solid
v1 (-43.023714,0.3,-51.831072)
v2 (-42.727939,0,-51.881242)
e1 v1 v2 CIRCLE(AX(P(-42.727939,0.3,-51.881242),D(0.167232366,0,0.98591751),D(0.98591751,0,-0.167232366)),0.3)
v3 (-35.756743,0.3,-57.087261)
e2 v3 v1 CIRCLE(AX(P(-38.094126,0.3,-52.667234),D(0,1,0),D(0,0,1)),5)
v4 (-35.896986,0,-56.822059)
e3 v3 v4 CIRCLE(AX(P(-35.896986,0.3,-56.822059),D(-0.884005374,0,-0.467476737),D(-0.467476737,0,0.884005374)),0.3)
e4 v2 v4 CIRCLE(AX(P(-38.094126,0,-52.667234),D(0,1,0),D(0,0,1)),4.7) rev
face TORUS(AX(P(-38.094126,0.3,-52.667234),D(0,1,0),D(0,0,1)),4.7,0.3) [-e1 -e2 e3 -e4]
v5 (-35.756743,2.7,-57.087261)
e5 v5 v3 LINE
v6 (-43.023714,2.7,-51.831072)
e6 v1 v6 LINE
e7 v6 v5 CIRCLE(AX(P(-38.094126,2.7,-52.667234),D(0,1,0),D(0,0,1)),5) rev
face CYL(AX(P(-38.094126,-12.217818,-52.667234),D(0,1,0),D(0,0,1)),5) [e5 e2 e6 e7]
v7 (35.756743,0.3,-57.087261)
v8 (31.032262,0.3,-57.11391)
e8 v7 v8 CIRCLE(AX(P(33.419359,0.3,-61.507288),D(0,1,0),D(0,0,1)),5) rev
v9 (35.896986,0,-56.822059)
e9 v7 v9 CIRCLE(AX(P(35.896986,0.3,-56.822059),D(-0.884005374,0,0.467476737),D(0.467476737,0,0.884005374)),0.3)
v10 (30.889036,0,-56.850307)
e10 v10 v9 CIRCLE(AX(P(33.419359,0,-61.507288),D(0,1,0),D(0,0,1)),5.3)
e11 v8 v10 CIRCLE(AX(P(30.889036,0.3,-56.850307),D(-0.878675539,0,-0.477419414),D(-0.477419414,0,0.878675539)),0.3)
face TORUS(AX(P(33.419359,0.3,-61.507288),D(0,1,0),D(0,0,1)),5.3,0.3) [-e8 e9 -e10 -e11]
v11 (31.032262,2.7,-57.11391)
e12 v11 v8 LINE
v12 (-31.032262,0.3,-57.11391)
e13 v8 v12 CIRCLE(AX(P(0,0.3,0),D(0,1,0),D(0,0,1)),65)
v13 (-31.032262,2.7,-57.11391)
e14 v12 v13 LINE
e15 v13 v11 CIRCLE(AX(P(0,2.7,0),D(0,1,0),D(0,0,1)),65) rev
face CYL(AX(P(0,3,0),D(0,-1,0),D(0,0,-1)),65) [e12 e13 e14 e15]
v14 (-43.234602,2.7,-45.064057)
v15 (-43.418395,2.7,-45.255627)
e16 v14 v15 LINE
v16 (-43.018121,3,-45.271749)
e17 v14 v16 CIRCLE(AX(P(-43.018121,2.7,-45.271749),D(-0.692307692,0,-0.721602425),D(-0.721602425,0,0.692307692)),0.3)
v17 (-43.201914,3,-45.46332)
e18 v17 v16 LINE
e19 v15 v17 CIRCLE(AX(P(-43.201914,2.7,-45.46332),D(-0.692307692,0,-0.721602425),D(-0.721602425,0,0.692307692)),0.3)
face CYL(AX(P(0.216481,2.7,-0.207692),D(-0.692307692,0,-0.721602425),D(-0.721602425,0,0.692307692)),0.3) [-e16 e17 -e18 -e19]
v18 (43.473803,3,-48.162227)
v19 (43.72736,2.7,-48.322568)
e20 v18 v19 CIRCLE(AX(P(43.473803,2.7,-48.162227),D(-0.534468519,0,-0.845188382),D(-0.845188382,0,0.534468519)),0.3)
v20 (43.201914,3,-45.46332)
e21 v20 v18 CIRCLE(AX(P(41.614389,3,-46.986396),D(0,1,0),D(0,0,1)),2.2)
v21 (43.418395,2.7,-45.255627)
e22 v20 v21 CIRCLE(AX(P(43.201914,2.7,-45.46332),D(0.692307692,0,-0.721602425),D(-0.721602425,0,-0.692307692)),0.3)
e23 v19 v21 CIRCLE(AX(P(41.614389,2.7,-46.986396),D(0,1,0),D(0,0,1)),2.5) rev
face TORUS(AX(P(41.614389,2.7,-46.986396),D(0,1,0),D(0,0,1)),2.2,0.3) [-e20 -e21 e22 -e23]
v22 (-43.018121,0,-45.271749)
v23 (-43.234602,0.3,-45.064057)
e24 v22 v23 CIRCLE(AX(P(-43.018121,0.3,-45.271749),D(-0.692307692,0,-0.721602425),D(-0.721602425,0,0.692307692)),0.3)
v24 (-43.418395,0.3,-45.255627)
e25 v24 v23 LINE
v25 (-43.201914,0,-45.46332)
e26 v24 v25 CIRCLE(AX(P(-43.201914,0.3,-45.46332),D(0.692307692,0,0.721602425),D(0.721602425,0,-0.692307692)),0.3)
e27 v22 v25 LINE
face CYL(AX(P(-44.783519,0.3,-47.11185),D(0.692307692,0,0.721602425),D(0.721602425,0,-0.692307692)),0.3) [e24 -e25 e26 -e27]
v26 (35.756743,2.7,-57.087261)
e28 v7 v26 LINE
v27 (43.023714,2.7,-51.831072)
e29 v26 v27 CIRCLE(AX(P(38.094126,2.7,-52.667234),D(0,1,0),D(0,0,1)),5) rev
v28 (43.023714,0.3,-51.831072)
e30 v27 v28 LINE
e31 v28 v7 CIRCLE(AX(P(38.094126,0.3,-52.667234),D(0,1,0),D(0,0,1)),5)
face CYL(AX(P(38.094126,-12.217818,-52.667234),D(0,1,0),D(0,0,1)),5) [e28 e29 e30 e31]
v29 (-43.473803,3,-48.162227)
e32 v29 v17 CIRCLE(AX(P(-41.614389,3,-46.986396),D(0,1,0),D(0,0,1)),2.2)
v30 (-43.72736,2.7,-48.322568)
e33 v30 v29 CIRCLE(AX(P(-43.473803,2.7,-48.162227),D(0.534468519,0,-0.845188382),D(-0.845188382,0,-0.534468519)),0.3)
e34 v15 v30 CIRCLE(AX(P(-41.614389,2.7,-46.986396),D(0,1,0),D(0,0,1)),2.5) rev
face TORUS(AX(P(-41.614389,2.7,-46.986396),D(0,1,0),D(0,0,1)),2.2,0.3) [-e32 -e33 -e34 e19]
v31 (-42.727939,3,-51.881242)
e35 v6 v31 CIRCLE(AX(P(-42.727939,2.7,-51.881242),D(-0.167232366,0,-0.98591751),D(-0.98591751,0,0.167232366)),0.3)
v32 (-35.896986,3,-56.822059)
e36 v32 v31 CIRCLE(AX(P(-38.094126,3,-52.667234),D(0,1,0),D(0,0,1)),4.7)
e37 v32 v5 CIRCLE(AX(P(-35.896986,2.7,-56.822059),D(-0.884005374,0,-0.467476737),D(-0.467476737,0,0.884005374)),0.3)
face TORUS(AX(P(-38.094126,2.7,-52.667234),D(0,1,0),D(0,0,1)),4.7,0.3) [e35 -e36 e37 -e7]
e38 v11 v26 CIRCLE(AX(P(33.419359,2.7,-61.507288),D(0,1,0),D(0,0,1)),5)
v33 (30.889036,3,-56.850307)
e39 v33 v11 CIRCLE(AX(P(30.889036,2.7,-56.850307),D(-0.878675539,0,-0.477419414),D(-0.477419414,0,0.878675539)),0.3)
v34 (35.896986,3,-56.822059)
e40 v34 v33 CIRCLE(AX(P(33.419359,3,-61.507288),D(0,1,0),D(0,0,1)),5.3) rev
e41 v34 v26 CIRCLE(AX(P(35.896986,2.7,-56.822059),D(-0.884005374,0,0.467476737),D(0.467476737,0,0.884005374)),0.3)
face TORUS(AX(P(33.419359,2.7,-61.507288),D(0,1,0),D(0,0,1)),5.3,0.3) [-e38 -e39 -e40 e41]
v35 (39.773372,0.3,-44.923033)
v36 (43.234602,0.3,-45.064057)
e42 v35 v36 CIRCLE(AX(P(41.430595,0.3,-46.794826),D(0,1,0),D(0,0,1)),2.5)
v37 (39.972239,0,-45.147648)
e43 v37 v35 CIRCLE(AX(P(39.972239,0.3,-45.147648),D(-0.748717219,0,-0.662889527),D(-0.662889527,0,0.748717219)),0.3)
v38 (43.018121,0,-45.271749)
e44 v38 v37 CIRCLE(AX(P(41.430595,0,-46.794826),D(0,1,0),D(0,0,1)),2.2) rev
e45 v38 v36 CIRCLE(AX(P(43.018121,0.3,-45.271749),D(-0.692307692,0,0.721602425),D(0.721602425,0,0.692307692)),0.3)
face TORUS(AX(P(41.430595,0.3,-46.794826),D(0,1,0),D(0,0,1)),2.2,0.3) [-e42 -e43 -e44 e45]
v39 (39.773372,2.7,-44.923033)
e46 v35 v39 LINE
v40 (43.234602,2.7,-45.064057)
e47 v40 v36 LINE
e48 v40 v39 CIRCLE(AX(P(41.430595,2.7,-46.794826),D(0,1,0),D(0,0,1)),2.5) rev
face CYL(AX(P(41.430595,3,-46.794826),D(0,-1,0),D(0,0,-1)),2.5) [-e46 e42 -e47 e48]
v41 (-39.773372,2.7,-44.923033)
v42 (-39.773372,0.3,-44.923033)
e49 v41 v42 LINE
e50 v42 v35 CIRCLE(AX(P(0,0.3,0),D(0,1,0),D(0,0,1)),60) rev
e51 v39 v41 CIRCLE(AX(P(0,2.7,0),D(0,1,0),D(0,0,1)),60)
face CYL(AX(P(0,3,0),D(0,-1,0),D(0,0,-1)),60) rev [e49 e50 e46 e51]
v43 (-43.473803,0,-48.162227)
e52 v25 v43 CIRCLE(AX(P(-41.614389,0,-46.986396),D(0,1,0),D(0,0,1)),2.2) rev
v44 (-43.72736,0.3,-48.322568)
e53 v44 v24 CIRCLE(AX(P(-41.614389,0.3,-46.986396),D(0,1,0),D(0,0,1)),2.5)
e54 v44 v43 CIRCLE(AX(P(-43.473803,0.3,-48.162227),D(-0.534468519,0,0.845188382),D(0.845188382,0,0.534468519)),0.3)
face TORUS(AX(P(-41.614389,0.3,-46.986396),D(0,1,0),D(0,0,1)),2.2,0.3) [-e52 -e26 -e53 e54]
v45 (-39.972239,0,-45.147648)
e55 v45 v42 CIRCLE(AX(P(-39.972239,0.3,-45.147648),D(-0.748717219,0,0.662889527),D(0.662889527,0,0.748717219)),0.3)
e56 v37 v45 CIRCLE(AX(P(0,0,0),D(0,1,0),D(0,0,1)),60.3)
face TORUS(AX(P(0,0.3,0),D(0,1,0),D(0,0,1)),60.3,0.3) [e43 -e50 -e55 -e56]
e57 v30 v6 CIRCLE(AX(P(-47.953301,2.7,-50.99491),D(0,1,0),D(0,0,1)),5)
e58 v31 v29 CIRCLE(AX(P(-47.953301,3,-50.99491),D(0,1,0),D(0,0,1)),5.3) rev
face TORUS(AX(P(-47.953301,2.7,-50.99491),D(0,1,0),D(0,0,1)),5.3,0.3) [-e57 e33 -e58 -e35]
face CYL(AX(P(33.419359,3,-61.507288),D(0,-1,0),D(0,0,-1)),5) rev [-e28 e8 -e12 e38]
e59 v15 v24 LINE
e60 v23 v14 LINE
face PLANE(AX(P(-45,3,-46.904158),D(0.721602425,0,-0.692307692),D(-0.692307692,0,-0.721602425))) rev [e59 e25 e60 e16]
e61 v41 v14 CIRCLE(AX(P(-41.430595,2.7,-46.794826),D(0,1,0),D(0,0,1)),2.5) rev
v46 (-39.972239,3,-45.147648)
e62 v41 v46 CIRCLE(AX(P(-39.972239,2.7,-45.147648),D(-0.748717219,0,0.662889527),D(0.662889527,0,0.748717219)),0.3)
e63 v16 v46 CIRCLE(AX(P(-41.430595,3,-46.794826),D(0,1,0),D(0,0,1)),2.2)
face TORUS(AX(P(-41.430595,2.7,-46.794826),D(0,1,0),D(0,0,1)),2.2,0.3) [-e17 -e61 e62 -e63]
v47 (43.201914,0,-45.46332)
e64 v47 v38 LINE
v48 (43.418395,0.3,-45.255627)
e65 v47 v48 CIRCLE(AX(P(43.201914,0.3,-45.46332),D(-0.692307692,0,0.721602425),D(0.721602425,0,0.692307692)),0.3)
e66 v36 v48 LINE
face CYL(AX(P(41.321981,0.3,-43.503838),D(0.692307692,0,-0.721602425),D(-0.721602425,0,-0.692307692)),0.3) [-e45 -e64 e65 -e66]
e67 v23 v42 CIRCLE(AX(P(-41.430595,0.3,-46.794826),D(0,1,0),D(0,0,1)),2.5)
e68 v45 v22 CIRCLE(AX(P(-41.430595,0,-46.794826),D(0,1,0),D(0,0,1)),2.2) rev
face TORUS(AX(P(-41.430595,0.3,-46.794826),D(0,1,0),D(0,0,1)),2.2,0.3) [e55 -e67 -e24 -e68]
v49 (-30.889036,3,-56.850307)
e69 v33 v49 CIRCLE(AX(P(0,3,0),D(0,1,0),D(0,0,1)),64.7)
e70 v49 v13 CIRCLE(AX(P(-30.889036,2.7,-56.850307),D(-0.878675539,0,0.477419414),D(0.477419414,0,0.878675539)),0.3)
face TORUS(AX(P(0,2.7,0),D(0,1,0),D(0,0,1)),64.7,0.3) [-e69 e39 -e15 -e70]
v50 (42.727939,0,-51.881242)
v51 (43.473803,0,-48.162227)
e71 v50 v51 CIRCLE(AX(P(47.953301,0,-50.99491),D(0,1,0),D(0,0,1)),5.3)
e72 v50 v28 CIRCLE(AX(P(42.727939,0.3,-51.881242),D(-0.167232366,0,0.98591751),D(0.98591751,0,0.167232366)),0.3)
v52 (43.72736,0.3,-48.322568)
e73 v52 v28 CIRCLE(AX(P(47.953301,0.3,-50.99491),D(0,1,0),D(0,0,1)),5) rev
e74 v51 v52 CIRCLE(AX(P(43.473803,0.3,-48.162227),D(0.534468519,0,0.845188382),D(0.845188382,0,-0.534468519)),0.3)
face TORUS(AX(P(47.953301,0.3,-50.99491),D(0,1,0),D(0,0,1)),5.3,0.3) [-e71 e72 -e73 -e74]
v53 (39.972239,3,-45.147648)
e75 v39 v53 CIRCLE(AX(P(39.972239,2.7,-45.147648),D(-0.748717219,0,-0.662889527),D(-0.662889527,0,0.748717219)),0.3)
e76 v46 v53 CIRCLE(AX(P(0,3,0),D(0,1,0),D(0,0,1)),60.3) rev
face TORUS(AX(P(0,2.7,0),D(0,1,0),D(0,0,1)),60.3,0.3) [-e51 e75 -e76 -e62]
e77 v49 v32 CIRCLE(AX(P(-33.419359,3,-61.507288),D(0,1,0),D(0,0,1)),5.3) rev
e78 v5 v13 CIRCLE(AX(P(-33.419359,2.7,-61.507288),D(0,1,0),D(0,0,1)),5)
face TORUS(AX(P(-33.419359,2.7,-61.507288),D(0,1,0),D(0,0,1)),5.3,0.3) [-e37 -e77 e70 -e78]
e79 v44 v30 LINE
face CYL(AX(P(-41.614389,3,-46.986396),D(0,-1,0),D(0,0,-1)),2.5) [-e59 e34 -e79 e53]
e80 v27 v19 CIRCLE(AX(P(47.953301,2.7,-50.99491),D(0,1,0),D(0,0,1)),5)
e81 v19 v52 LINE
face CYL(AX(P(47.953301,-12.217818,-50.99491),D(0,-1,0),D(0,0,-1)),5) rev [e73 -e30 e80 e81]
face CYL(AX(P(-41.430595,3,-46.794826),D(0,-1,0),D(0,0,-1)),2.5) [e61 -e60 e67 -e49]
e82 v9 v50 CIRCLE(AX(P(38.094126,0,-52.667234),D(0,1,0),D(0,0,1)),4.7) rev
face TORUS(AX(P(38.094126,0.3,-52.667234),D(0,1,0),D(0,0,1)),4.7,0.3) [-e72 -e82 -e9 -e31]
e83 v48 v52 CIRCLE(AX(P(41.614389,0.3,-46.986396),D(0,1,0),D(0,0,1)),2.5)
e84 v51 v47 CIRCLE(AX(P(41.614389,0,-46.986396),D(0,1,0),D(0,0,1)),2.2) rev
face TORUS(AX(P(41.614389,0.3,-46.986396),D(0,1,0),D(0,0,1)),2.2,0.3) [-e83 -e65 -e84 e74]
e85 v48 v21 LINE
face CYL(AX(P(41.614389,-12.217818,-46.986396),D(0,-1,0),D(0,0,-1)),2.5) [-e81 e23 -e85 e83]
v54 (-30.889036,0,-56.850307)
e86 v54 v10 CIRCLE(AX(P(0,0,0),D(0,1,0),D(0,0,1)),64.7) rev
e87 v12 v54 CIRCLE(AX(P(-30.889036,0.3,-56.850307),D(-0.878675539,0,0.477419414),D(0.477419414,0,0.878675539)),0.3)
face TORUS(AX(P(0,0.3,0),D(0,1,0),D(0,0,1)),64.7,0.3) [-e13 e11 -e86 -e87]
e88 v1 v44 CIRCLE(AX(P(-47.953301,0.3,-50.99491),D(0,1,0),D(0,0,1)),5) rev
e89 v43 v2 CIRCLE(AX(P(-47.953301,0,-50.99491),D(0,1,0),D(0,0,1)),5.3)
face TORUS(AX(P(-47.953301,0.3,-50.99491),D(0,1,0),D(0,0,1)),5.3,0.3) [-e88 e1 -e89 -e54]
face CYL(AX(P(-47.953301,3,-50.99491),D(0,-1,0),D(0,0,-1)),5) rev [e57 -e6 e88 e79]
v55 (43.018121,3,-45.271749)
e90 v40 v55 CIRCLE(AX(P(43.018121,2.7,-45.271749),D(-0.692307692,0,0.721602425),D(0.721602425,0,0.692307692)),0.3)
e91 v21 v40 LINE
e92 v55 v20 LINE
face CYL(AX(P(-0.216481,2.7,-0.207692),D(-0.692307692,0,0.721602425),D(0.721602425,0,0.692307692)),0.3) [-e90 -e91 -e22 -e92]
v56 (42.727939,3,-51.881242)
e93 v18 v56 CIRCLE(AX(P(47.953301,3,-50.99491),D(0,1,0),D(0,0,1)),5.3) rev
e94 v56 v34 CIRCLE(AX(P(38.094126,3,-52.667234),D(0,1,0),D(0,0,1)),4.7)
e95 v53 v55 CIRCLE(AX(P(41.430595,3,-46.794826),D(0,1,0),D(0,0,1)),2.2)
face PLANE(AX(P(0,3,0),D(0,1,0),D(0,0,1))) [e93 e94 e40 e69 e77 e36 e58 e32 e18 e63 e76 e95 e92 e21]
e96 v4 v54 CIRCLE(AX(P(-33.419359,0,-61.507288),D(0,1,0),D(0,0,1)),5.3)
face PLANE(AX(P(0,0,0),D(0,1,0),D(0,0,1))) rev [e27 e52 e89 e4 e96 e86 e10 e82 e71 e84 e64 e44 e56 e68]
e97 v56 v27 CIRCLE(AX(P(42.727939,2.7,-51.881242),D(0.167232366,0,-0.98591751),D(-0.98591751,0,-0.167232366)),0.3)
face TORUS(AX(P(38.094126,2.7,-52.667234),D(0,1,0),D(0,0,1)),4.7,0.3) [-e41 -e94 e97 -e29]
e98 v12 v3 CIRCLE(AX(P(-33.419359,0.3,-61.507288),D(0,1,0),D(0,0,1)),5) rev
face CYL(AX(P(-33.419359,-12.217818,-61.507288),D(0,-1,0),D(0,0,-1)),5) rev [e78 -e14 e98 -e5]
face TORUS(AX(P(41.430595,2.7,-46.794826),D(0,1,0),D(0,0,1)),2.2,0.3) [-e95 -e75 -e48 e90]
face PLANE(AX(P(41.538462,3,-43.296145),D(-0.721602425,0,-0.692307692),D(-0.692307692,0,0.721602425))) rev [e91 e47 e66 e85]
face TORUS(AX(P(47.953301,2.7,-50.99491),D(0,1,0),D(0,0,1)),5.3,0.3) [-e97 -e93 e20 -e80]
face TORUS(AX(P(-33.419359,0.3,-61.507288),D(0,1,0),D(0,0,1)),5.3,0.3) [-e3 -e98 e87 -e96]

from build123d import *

# Parameters (mm, degrees)
EXTRUDE_1_DEPTH = 3
EXTRUDE_2_DEPTH = 3
FILLET_3_R      = 5
FILLET_1_R      = 2.5
FILLET_2_R      = 0.3


with BuildPart() as part:
    # Эскиз1 → Бобышка-Вытянуть1 (new body)
    with BuildSketch(Plane(origin=(0, 0, 0), x_dir=(1, 0, 0), z_dir=(0, 1, 0))):
        with BuildLine():
            Line((-45, 46.904157598234306), (-41.53846153846153, 43.29614547529319))
            ThreePointArc((-41.53846153846153, 43.29614547529319), (3.67e-15, 60), (41.53846153846155, 43.29614547529319))
            Line((41.53846153846155, 43.29614547529319), (45, 46.904157598234306))
            ThreePointArc((45, 46.904157598234306), (3.98e-15, 65.00000000000001), (-45, 46.904157598234306))
        make_face()
    extrude(amount=EXTRUDE_1_DEPTH)

    # Эскиз2 → Бобышка-Вытянуть2 (add)
    with BuildSketch(Plane(origin=(0, 3, 0), x_dir=(1, 0, 0), z_dir=(0, 1, 0))):
        with BuildLine():
            Line((-42.02974987239072, 49.583264572477226), (-33.93309379020482, 55.439563001751424))
            ThreePointArc((-33.93309379020482, 55.439563001751424), (-41.02444375843438, 56.71855969884159), (-42.02974987239072, 49.583264572477226))
        make_face()
    extrude_2 = extrude(amount=-EXTRUDE_2_DEPTH)

    # Зеркальное отражение1: Бобышка-Вытянуть2 across plane
    add(extrude_2.mirror(Plane(origin=(0, 0, 0), x_dir=(0, 0, 1), z_dir=(1, 0, 0))))

    # Скругление3
    fillet_3_edges = [part.edges().sort_by_distance(p)[0] for p in [
        (-42.02974987239072, 1.5, -49.583264572477226),
        (-33.93309379020482, 1.5, -55.439563001751424),
        (42.02974987239072, 1.5, -49.583264572477226),
        (33.93309379020482, 1.5, -55.439563001751424),
    ]]
    fillet(fillet_3_edges, radius=FILLET_3_R)

    # Скругление1
    fillet_1_edges = [part.edges().sort_by_distance(p)[0] for p in [
        (-45.00000000000001, 1.5, -46.904157598234306),
        (-41.53846153846153, 1.5, -43.29614547529319),
        (45, 1.5, -46.904157598234306),
        (41.53846153846155, 1.5, -43.29614547529319),
    ]]
    fillet(fillet_1_edges, radius=FILLET_1_R - 0.0001)  # a hair under: the kernel refuses the full size

    # Скругление2
    fillet_2_edges = [part.edges().sort_by_distance(p)[0] for p in [
        (41.02444375843438, 0, -56.71855969884159),
        (41.02444375843438, 3, -56.71855969884159),
        (7.11e-15, 0, -65.00000000000001),
        (7.11e-15, 3, -65.00000000000001),
        (-41.02444375843439, 0, -56.71855969884159),
        (-41.02444375843439, 3, -56.71855969884159),
        (43.05092646297095, 0, -50.01169135950295),
        (33.39115614651435, 3, -56.5073672828282),
        (33.39115614651436, 0, -56.5073672828282),
        (-33.39115614651442, 3, -56.507367282828206),
        (-33.39115614651442, 0, -56.507367282828206),
        (-43.05092646297095, 3, -50.01169135950294),
        (-43.32649192788036, 0, -45.15983567919837),
        (-43.32649192788036, 3, -45.15983567919837),
        (43.32649192788038, 0, -45.15983567919839),
        (0, 0, -60),
        (-43.05092646297095, 0, -50.01169135950294),
        (41.53237029407291, 0, -44.296859977676405),
        (44.10182670999084, 0, -46.73582398498882),
        (-41.532370294072905, 0, -44.29685997767639),
        (-44.10182670999084, 0, -46.7358239849889),
        (43.050926462970956, 3, -50.01169135950295),
        (0, 3, -60),
        (43.32649192788038, 3, -45.15983567919839),
        (41.53237029407291, 3, -44.296859977676405),
        (44.10182670999084, 3, -46.73582398498882),
        (-41.532370294072905, 3, -44.29685997767639),
        (-44.10182670999083, 3, -46.735823984988905),
    ]]
    fillet(fillet_2_edges, radius=FILLET_2_R)


solid = part.part
